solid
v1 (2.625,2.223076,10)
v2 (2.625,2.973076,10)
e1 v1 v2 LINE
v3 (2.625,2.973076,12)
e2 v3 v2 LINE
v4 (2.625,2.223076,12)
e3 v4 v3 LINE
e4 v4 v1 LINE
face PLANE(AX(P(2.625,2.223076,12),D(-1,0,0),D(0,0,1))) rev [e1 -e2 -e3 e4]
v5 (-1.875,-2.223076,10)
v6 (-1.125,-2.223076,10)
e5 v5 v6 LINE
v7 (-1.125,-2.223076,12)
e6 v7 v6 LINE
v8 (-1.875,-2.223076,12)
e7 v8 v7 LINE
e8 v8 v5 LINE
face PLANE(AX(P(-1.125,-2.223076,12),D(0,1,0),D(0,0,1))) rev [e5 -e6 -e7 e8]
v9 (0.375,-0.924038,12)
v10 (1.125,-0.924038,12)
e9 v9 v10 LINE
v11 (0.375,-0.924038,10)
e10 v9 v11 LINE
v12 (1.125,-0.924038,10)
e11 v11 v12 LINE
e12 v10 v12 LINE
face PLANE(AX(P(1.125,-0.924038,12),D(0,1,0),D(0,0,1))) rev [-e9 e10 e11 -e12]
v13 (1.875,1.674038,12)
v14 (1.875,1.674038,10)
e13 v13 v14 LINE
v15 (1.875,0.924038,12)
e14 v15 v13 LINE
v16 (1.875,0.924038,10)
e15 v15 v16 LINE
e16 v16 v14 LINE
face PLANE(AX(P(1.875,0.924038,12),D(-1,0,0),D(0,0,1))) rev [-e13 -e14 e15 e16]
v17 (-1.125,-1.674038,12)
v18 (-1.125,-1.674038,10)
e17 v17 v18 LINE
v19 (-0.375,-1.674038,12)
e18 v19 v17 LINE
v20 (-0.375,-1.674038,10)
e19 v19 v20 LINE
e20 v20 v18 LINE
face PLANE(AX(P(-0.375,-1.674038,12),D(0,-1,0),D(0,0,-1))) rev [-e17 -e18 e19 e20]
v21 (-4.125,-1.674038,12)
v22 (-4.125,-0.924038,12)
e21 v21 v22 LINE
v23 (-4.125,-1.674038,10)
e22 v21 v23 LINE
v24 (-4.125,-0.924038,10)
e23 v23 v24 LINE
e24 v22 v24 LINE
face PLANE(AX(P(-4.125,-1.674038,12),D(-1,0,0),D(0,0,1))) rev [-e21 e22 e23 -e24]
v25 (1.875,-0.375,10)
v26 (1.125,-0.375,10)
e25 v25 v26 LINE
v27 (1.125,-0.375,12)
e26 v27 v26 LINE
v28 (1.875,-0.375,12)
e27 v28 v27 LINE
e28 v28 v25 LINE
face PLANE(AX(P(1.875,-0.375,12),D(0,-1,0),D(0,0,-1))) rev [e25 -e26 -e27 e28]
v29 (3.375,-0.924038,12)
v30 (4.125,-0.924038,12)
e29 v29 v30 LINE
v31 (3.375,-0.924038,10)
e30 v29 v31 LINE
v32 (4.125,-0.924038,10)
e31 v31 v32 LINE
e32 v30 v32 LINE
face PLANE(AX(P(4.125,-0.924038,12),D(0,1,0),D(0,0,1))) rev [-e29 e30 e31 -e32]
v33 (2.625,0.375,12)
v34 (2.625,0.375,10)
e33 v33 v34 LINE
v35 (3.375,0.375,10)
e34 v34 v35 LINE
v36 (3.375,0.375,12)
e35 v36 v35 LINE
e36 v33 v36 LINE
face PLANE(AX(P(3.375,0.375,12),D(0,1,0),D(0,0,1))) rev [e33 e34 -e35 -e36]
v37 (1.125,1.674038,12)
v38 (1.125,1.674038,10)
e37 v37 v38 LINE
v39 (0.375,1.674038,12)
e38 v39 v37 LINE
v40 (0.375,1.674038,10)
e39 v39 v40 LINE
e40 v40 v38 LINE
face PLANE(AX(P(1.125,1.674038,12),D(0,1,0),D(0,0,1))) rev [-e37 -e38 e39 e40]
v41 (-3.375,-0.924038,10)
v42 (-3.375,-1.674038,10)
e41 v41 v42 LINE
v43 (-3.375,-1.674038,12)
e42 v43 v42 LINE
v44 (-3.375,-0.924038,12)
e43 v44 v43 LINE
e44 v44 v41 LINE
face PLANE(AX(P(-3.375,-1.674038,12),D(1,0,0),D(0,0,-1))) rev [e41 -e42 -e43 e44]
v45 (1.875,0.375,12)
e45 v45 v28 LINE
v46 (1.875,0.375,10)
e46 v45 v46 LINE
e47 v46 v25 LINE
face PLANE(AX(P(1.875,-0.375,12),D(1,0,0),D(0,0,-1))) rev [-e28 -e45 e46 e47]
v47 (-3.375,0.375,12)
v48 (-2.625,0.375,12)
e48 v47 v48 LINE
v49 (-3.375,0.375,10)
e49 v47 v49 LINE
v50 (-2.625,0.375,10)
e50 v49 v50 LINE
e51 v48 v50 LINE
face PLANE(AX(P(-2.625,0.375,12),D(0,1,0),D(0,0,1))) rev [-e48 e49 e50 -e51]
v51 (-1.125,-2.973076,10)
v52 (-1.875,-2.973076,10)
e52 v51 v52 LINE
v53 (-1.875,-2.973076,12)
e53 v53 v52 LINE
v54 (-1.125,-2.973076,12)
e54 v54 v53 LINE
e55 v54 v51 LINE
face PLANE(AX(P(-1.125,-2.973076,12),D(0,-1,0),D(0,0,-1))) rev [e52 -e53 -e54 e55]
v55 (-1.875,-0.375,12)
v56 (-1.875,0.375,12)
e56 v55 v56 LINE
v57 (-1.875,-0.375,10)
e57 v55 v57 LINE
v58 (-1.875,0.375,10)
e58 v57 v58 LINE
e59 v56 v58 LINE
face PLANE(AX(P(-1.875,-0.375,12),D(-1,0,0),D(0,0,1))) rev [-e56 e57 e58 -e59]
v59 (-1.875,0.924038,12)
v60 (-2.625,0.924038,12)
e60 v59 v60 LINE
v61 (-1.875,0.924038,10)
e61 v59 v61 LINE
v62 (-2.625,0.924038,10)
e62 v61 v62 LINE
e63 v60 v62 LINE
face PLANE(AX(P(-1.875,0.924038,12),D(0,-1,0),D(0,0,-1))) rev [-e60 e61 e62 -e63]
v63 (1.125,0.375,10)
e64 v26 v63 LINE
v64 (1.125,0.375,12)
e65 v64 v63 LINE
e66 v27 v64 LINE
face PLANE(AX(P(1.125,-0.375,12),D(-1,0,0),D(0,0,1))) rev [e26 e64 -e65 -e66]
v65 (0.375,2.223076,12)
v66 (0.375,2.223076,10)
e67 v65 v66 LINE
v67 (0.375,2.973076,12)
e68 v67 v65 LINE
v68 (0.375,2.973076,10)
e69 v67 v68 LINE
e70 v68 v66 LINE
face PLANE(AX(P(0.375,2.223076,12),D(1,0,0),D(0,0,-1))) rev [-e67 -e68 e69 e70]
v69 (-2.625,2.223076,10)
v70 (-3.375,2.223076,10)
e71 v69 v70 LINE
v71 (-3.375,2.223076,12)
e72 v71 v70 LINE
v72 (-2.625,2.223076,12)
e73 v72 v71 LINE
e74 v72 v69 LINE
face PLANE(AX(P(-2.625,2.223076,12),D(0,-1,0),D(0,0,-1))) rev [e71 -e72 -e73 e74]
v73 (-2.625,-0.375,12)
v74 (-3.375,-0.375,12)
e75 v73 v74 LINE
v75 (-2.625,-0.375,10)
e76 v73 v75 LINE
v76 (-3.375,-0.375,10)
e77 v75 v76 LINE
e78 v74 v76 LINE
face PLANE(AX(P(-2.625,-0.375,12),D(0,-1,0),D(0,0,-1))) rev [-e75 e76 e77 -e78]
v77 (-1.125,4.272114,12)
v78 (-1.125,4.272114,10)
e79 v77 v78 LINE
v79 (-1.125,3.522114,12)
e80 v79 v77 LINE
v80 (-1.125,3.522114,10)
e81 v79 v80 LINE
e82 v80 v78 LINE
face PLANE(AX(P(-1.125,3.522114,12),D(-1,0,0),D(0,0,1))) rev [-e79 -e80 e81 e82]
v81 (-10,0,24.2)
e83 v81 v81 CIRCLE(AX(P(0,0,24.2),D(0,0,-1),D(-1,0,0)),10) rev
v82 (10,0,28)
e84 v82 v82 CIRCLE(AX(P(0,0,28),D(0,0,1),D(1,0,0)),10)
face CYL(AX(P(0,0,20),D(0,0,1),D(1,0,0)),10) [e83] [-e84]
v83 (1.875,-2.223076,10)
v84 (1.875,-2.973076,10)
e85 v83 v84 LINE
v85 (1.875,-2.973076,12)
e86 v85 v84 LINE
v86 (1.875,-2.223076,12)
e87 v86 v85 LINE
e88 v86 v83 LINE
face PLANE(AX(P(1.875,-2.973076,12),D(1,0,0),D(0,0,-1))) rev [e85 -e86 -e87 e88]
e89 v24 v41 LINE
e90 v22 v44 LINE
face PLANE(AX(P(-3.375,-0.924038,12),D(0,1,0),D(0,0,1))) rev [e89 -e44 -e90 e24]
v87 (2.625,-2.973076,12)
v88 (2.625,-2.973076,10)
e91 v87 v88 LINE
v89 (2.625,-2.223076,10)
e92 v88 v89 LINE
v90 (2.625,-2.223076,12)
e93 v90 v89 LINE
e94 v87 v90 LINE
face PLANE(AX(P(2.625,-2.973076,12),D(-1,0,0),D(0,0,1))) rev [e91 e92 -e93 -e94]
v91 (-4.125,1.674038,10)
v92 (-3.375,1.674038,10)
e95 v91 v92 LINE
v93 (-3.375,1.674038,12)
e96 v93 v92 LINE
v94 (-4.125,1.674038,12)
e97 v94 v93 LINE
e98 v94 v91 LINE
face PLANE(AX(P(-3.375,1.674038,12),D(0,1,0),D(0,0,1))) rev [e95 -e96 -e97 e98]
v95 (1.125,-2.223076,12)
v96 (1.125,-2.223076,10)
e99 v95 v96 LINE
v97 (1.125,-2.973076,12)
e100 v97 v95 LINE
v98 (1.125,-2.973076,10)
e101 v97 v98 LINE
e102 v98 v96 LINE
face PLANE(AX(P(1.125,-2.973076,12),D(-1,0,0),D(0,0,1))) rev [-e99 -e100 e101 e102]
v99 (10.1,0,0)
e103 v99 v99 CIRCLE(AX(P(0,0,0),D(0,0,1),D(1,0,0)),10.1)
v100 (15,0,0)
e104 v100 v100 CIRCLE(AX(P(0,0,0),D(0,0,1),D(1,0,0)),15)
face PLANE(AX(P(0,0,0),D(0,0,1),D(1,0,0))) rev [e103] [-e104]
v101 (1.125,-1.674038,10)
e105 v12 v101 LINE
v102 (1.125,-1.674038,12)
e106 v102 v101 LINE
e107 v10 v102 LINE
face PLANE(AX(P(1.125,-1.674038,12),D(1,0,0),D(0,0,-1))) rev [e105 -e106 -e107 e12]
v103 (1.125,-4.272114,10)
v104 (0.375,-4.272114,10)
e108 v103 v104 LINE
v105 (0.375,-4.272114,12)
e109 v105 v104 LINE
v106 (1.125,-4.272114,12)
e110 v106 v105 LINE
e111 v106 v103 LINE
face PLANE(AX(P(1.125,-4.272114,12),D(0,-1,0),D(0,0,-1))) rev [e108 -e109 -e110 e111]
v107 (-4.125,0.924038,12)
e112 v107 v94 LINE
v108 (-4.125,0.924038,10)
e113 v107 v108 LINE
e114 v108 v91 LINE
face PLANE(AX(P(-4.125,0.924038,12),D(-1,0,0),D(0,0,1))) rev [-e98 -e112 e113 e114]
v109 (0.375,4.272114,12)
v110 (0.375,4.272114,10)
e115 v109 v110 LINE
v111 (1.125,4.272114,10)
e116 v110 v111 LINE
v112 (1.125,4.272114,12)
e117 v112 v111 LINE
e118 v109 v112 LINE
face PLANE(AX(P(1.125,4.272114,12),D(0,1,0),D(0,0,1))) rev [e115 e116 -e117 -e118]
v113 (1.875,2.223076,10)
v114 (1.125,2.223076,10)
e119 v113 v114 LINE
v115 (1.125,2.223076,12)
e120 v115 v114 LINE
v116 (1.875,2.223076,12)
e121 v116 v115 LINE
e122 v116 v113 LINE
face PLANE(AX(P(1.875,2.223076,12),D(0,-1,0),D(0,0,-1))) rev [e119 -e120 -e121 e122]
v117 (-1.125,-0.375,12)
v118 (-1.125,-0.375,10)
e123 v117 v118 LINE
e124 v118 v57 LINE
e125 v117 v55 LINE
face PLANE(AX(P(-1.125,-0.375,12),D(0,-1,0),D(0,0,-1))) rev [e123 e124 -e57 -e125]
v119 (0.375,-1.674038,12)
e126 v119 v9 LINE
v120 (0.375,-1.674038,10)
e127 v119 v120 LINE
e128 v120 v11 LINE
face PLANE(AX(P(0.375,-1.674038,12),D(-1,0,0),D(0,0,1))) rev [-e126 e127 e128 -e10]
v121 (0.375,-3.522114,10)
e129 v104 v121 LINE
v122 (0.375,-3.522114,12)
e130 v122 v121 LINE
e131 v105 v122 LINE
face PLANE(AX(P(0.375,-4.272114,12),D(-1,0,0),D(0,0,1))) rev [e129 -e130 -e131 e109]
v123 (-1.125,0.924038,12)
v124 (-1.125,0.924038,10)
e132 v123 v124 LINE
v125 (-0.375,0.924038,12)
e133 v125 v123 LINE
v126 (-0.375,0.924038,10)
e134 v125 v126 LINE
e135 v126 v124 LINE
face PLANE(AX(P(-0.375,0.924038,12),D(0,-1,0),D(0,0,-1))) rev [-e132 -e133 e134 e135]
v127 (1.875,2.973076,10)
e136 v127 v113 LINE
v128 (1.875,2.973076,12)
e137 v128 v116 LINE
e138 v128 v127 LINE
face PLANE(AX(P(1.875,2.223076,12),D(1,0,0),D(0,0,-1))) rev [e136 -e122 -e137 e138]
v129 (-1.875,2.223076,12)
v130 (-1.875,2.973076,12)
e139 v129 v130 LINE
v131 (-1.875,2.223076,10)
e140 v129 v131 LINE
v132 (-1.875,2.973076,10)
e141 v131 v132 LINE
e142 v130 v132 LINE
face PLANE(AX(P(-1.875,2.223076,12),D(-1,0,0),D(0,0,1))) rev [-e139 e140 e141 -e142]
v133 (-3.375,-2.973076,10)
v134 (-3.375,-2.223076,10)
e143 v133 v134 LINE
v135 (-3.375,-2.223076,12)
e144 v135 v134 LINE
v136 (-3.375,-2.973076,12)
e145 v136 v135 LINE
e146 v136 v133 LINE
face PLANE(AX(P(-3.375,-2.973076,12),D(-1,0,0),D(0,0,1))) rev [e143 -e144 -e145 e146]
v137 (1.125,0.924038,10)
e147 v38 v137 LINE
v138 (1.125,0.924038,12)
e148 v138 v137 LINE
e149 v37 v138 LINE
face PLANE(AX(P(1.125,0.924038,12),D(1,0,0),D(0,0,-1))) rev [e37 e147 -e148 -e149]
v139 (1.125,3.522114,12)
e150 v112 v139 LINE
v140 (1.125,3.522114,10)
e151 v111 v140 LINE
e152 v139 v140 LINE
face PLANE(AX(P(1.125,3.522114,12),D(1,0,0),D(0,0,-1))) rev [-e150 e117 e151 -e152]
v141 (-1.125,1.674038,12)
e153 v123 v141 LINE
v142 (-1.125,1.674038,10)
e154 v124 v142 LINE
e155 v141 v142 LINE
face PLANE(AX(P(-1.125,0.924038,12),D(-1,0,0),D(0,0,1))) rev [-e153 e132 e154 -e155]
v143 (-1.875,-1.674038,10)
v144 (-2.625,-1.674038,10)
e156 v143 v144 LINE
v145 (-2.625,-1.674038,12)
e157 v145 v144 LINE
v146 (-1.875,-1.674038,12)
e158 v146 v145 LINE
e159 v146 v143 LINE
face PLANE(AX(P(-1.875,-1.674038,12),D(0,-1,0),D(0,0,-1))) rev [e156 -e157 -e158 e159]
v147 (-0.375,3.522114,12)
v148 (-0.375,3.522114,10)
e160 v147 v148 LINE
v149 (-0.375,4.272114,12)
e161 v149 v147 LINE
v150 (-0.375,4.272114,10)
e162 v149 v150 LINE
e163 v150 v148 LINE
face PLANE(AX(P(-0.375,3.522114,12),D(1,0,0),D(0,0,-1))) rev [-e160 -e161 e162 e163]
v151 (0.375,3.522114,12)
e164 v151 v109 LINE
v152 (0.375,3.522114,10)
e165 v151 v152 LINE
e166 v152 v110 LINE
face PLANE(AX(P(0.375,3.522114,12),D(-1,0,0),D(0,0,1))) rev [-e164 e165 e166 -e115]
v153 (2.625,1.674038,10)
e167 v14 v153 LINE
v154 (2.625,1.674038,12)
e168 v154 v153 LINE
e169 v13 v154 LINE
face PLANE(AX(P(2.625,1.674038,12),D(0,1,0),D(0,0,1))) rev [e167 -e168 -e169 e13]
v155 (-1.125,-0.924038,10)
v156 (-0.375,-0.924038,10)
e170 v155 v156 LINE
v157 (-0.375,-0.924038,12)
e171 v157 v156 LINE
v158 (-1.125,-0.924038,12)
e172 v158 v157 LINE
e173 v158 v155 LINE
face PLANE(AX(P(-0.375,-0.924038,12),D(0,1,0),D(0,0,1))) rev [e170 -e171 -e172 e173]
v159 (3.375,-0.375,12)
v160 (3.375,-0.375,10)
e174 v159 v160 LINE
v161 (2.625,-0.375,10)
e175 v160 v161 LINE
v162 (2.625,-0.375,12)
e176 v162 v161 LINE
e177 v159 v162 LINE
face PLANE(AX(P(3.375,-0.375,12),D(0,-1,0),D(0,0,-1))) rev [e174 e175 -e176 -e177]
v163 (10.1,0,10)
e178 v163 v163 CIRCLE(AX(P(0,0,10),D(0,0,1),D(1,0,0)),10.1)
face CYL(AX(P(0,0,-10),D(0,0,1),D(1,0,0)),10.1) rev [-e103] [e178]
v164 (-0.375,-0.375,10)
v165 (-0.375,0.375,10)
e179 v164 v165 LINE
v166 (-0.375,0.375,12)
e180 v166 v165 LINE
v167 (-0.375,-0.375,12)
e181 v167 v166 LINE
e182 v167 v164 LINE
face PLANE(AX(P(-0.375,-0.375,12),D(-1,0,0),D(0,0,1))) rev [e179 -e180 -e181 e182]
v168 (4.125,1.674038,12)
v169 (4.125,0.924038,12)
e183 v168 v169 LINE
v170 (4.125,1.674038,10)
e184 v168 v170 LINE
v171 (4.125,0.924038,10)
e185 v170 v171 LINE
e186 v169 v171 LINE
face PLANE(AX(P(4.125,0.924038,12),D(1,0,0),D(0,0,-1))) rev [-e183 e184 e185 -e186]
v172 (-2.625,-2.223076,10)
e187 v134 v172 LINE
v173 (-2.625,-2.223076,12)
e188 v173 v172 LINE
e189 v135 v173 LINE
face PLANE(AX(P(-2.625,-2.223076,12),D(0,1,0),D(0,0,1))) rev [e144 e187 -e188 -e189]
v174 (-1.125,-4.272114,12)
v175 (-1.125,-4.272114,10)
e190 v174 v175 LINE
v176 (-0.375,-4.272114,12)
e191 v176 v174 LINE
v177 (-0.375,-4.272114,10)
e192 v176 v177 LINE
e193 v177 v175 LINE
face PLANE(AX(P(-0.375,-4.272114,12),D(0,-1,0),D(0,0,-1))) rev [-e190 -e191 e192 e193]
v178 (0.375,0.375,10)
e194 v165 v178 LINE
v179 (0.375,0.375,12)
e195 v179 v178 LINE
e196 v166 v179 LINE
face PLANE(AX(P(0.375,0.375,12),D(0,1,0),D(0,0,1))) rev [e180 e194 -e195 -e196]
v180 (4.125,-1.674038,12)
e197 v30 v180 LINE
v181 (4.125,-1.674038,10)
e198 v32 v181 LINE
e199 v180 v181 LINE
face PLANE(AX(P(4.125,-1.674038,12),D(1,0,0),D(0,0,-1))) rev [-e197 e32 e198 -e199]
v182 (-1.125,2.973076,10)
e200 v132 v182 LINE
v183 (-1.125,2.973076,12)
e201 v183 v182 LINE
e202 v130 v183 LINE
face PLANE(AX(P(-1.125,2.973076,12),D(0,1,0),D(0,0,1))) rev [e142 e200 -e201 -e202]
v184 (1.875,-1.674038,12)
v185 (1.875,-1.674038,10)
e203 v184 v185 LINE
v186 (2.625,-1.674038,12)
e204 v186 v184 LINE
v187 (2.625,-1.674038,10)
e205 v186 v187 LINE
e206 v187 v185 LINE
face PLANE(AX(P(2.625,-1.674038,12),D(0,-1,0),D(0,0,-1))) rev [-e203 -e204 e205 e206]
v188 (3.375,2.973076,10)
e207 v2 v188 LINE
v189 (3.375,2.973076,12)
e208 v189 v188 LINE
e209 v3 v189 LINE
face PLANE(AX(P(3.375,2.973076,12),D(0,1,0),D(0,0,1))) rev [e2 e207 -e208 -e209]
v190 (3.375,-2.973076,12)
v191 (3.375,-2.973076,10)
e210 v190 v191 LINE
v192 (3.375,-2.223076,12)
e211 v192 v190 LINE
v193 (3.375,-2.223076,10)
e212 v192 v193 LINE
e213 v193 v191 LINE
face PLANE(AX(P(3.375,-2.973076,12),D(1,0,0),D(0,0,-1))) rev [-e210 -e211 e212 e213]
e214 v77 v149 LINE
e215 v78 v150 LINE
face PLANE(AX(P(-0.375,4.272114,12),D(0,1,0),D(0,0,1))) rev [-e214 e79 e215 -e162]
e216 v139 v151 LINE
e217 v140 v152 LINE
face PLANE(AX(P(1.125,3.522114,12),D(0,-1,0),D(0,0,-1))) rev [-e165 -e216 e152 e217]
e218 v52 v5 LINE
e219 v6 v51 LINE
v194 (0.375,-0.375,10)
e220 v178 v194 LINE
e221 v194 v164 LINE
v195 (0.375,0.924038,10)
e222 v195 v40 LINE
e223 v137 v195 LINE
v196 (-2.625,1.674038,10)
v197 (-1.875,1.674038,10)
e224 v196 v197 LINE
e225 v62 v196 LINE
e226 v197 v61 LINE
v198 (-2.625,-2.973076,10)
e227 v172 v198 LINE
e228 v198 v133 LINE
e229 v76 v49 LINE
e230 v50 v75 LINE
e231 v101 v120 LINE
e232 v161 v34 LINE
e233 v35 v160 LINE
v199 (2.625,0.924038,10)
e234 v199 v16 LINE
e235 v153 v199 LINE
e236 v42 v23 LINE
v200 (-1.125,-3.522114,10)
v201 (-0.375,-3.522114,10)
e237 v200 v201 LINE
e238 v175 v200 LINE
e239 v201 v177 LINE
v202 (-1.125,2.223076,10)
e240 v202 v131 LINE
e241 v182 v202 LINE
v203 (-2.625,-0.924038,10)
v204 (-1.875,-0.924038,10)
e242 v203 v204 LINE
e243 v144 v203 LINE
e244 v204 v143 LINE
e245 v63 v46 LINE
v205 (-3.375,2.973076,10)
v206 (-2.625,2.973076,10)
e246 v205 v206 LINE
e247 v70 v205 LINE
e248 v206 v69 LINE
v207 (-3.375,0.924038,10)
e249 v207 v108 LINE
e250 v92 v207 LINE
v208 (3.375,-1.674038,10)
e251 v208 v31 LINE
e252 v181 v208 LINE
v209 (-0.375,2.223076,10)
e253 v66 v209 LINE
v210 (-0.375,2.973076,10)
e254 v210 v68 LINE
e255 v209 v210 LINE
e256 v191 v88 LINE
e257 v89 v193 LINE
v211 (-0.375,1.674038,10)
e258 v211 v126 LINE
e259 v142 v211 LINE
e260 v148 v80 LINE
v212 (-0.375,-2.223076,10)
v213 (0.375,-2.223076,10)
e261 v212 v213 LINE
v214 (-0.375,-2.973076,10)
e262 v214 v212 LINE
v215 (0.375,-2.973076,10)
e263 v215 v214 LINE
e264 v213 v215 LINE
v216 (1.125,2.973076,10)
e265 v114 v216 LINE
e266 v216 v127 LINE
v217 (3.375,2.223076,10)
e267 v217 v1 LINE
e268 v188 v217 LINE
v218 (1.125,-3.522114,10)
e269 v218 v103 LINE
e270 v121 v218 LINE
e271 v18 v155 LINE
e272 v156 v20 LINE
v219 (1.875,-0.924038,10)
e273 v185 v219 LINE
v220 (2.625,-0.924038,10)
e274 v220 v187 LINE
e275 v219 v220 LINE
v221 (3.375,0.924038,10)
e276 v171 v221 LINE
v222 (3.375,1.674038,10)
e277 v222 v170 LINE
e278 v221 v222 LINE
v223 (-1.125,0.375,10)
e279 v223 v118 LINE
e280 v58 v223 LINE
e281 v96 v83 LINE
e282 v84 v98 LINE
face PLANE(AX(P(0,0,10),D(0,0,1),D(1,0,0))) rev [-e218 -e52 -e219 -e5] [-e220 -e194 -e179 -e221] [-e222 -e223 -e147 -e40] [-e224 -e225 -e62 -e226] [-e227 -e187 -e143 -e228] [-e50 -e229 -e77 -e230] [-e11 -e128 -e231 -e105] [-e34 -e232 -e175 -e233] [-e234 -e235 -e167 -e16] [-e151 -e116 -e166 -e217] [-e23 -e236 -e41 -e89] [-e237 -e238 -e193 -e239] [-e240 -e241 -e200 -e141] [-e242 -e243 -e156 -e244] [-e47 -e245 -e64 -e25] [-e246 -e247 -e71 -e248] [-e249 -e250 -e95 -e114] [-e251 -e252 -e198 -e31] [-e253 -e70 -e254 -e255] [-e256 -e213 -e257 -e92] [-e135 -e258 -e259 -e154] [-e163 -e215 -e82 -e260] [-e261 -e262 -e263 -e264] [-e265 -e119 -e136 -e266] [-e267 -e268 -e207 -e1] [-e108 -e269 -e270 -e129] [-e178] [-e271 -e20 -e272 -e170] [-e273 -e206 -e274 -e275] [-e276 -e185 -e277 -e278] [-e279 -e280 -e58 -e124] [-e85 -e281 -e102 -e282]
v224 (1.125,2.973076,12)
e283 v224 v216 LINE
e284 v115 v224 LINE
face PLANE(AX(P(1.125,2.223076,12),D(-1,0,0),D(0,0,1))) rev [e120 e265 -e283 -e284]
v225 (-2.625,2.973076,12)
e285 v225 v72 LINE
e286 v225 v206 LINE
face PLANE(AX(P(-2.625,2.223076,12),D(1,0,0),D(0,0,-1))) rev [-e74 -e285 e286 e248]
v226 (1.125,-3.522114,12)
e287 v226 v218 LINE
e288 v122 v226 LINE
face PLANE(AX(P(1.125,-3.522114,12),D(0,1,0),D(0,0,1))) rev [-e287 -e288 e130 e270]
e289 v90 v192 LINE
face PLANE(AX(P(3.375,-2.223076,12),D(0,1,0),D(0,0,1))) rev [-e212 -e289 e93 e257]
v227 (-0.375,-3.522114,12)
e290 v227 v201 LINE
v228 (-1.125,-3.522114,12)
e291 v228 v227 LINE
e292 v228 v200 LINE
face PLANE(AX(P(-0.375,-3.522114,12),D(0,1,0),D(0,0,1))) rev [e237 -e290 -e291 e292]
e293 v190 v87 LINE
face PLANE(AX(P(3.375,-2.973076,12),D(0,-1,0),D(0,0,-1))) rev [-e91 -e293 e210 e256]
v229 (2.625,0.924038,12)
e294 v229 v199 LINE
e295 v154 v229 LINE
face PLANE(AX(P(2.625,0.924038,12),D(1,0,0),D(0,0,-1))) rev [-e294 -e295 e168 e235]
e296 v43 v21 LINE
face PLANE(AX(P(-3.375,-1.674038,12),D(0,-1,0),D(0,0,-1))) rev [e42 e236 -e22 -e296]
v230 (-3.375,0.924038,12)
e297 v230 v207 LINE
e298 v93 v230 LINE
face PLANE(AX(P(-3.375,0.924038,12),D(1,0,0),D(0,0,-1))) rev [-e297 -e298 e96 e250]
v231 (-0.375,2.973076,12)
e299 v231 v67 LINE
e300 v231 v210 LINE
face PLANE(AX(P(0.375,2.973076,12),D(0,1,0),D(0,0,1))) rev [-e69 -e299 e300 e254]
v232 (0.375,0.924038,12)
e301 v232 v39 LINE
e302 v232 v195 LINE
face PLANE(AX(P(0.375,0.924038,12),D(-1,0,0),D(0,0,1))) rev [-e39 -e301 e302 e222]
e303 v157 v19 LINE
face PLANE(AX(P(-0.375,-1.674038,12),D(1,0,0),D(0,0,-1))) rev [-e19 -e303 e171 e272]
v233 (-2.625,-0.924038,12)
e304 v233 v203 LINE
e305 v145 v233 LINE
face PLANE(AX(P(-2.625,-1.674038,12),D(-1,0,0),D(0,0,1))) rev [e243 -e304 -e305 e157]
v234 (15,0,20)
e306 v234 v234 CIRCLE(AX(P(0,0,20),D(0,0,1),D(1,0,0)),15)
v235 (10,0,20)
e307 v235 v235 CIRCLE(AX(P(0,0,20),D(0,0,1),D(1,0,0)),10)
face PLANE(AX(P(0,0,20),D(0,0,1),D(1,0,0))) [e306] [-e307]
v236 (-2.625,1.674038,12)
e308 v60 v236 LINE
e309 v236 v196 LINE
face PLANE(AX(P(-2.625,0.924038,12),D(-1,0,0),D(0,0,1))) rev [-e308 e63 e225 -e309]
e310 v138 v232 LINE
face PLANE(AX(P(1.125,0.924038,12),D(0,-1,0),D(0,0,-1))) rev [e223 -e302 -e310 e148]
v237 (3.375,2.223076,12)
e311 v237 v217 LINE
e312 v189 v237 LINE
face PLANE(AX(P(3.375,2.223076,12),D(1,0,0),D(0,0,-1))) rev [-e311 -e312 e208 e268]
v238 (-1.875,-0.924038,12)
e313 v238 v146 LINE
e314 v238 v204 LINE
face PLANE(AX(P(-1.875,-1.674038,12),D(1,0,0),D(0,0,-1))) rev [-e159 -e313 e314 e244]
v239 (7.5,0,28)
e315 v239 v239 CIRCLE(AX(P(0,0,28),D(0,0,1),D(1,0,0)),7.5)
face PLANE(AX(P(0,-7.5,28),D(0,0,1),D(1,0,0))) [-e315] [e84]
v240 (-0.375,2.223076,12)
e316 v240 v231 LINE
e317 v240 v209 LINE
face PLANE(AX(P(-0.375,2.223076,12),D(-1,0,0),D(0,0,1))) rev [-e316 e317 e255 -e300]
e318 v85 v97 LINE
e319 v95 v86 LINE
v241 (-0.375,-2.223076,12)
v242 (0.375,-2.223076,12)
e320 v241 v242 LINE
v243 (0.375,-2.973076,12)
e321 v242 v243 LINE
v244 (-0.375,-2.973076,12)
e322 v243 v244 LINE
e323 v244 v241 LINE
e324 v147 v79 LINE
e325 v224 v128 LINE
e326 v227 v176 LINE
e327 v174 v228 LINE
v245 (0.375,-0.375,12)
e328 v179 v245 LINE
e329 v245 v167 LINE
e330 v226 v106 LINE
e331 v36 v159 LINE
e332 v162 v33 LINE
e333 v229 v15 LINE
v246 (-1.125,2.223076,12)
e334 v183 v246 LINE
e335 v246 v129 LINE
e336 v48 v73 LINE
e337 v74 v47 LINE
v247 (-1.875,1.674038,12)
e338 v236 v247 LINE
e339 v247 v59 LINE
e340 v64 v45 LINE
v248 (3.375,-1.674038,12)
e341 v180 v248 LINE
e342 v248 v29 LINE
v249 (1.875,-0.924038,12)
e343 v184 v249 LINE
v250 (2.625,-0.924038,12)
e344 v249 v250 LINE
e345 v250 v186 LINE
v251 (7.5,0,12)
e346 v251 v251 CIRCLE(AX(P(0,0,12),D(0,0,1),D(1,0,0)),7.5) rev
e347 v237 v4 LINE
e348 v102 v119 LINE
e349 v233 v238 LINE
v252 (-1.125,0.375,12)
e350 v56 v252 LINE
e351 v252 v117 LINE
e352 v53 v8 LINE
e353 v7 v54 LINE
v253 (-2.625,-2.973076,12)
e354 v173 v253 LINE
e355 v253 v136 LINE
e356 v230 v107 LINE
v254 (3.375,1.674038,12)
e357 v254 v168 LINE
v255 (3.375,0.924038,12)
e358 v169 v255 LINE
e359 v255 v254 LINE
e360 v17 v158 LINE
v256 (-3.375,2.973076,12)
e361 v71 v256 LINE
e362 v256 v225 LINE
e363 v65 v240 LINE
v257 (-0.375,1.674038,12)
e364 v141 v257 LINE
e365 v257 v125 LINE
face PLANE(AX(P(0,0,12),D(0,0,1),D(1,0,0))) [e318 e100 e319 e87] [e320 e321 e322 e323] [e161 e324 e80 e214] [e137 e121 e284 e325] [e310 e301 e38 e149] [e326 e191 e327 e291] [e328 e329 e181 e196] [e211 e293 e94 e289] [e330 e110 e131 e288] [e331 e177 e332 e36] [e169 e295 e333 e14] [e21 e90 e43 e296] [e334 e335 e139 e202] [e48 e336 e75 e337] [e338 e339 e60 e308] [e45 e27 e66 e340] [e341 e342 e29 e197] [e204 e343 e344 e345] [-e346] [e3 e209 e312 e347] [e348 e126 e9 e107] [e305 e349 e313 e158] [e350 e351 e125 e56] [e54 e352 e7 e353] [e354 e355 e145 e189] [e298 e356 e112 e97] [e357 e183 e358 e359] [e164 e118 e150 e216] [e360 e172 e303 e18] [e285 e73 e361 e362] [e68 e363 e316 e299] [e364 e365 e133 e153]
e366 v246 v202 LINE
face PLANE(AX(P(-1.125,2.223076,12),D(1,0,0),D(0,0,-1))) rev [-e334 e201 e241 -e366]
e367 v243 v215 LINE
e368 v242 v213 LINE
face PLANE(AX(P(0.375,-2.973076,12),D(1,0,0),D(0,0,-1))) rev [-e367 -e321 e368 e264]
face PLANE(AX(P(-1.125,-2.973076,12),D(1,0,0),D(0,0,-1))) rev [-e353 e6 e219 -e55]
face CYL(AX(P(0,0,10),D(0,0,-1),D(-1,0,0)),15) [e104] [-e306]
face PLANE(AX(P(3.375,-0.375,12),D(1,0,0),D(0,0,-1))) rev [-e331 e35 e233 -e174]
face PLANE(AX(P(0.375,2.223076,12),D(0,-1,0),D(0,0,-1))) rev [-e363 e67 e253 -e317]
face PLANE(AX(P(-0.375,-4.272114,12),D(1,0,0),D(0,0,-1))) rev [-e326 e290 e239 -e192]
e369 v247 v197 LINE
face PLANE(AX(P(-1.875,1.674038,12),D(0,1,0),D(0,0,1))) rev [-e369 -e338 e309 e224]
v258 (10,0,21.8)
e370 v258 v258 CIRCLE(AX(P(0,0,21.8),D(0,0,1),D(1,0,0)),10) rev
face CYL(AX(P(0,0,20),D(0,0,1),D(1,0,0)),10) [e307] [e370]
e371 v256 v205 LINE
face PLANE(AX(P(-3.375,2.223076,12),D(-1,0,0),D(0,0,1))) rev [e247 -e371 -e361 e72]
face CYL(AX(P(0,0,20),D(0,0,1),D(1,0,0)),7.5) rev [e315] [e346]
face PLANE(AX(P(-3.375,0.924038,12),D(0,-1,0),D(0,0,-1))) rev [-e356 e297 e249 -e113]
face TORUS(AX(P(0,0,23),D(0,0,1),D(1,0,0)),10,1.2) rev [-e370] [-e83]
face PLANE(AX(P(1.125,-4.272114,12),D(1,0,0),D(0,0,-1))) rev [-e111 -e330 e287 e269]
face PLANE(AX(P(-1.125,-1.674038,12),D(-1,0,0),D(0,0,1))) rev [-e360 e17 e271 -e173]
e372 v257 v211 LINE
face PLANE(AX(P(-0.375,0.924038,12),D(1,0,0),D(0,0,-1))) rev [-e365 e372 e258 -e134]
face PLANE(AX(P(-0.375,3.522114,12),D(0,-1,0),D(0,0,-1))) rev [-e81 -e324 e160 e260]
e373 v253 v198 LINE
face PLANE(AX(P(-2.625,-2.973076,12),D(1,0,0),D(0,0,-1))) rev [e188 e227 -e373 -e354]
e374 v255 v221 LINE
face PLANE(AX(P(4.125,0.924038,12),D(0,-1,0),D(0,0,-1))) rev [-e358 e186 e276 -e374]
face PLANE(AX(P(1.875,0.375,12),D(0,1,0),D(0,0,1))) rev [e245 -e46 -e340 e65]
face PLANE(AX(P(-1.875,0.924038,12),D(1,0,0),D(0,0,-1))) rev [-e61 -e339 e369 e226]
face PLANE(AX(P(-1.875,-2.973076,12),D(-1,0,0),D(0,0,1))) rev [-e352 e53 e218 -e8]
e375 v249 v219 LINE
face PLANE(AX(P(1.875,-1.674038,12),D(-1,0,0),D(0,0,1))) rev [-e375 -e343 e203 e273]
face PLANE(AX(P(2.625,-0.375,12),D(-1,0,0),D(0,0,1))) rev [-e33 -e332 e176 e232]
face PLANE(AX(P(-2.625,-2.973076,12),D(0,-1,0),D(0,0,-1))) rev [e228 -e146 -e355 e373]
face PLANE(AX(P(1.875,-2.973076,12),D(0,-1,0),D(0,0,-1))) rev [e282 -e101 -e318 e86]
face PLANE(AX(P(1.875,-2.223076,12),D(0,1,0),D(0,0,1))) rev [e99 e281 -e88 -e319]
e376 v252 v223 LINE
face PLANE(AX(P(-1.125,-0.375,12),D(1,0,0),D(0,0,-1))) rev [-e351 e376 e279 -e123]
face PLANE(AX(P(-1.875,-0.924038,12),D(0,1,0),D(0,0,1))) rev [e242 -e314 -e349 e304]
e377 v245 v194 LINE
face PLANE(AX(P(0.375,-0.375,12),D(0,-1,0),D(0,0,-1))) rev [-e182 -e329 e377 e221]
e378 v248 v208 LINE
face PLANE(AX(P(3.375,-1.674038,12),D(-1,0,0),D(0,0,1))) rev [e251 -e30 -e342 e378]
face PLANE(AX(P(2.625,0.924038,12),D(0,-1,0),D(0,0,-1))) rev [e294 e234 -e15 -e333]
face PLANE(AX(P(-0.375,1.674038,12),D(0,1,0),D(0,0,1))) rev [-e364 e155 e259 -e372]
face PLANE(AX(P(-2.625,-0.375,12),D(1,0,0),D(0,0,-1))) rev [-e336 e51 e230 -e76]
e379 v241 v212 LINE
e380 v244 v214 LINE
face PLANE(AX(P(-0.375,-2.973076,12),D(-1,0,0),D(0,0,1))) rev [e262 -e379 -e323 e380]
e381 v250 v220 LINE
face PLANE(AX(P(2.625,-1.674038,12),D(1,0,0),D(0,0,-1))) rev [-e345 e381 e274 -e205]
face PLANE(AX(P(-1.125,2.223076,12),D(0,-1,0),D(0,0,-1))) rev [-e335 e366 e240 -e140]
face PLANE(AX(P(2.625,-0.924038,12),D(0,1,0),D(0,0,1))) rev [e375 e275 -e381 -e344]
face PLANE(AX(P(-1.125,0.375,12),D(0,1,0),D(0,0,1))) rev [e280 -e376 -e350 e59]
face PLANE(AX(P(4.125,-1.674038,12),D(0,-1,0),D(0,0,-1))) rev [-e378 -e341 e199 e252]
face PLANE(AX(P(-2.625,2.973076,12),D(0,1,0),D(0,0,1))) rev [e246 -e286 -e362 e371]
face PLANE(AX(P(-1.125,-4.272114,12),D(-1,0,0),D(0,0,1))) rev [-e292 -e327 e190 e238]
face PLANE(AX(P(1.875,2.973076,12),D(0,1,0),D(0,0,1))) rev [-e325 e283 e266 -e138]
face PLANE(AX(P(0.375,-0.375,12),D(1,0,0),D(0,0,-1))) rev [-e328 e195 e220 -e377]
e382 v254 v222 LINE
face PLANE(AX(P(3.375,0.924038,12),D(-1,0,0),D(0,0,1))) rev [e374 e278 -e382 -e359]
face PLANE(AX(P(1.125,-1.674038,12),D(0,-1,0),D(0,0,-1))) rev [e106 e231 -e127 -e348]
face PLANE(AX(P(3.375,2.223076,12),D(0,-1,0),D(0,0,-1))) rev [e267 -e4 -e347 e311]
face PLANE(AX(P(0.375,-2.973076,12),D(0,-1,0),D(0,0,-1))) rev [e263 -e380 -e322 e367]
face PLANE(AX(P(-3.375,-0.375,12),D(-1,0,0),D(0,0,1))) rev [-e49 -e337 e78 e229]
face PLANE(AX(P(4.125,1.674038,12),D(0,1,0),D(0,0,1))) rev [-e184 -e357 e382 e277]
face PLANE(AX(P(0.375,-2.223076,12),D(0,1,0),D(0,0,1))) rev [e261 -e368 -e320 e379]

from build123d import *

# Parameters (mm, degrees)
SKETCH1_R                  = 15
BOSS_EXTRUDE1_DEPTH        = 10
SKETCH2_R                  = 10.1
CUT_EXTRUDE1_DEPTH         = 20
SKETCH3_R                  = 15
BOSS_EXTRUDE2_DEPTH        = 10
SKETCH5_R                  = 10
CUT_EXTRUDE3_DEPTH         = 8
SKETCH8_W                  = 0.75
SKETCH8_H                  = 0.75
CUT_EXTRUDE5_DEPTH         = 2
FILL_START                 = -1.125
FILL_PATTERN2_OUTLINE_W    = 0.75
FILL_PATTERN2_OUTLINE_H    = 2
FILL_PATTERN2_DEPTH        = 0.75
FILL_START_2               = 0.375
FILL_PATTERN2_2_OUTLINE_W  = 0.75
FILL_PATTERN2_2_OUTLINE_H  = 2
FILL_PATTERN2_2_DEPTH      = 0.75
FILL_START_3               = -3.375
FILL_PATTERN2_3_OUTLINE_W  = 0.75
FILL_PATTERN2_3_OUTLINE_H  = 2
FILL_PATTERN2_3_DEPTH      = 0.75
FILL_START_4               = -1.875
FILL_PATTERN2_4_OUTLINE_W  = 0.75
FILL_PATTERN2_4_OUTLINE_H  = 2
FILL_PATTERN2_4_DEPTH      = 0.75
FILL_START_5               = 1.125
FILL_PATTERN2_5_OUTLINE_W  = 0.75
FILL_PATTERN2_5_OUTLINE_H  = 2
FILL_PATTERN2_5_DEPTH      = 0.75
FILL_START_6               = 2.625
FILL_PATTERN2_6_OUTLINE_W  = 0.75
FILL_PATTERN2_6_OUTLINE_H  = 2
FILL_PATTERN2_6_DEPTH      = 0.75
FILL_START_7               = -4.125
FILL_PATTERN2_7_OUTLINE_W  = 0.75
FILL_PATTERN2_7_OUTLINE_H  = 2
FILL_PATTERN2_7_DEPTH      = 0.75
FILL_START_8               = -2.625
FILL_PATTERN2_8_OUTLINE_W  = 0.75
FILL_PATTERN2_8_OUTLINE_H  = 2
FILL_PATTERN2_8_DEPTH      = 0.75
FILL_START_9               = -0.375
FILL_PATTERN2_9_OUTLINE_W  = 0.75
FILL_PATTERN2_9_OUTLINE_H  = 2
FILL_PATTERN2_9_DEPTH      = 0.75
FILL_START_10              = 1.875
FILL_PATTERN2_10_OUTLINE_W = 0.75
FILL_PATTERN2_10_OUTLINE_H = 2
FILL_PATTERN2_10_DEPTH     = 0.75
FILL_START_11              = 3.375
FILL_PATTERN2_11_OUTLINE_W = 0.75
FILL_PATTERN2_11_OUTLINE_H = 2
FILL_PATTERN2_11_DEPTH     = 0.75
SKETCH15_W                 = 16
SKETCH15_H                 = 2.5
SKETCH16_R                 = 1.2


# Read off the part's stored shape, not the designer's step: Fill Pattern2
with BuildPart() as part:
    # Sketch1 → Boss-Extrude1 (new body)
    with BuildSketch(Plane.XY):
        Circle(SKETCH1_R)
    extrude(amount=BOSS_EXTRUDE1_DEPTH)

    # Sketch2 → Cut-Extrude1 (cut)
    with BuildSketch(Plane.XY.offset(10)):
        Circle(SKETCH2_R)
    extrude(amount=-CUT_EXTRUDE1_DEPTH, mode=Mode.SUBTRACT)

    # Sketch3 → Boss-Extrude2 (add)
    with BuildSketch(Plane.XY.offset(10)):
        Circle(SKETCH3_R)
    extrude(amount=BOSS_EXTRUDE2_DEPTH)

    # Sketch5 → Cut-Extrude3 (cut)
    with BuildSketch(Plane.XY.offset(20)):
        Circle(SKETCH5_R)
    extrude(amount=-CUT_EXTRUDE3_DEPTH, mode=Mode.SUBTRACT)

    # Sketch8 → Cut-Extrude5 (cut)
    with BuildSketch(Plane(origin=(0, 0, 10), x_dir=(-1, 0, 0), z_dir=(0, 0, -1))):
        Rectangle(SKETCH8_W, SKETCH8_H)
    extrude(amount=-CUT_EXTRUDE5_DEPTH, mode=Mode.SUBTRACT)

    # Fill Pattern2 outline → Fill Pattern2 (cut)
    with BuildSketch(Plane.YZ.offset(FILL_START)):
        with Locations((-1.299038106, 11)):
            Rectangle(FILL_PATTERN2_OUTLINE_W, FILL_PATTERN2_OUTLINE_H)
        with Locations((1.299038106, 11)):
            Rectangle(FILL_PATTERN2_OUTLINE_W, FILL_PATTERN2_OUTLINE_H)
        with Locations((-3.897114317, 11)):
            Rectangle(FILL_PATTERN2_OUTLINE_W, FILL_PATTERN2_OUTLINE_H)
        with Locations((3.897114317, 11)):
            Rectangle(FILL_PATTERN2_OUTLINE_W, FILL_PATTERN2_OUTLINE_H)
    extrude(amount=FILL_PATTERN2_DEPTH, mode=Mode.SUBTRACT)

    # Fill Pattern2 2 outline → Fill Pattern2 2 (cut)
    with BuildSketch(Plane.YZ.offset(FILL_START_2)):
        with Locations((-1.299038106, 11)):
            Rectangle(FILL_PATTERN2_2_OUTLINE_W, FILL_PATTERN2_2_OUTLINE_H)
        with Locations((1.299038106, 11)):
            Rectangle(FILL_PATTERN2_2_OUTLINE_W, FILL_PATTERN2_2_OUTLINE_H)
        with Locations((-3.897114317, 11)):
            Rectangle(FILL_PATTERN2_2_OUTLINE_W, FILL_PATTERN2_2_OUTLINE_H)
        with Locations((3.897114317, 11)):
            Rectangle(FILL_PATTERN2_2_OUTLINE_W, FILL_PATTERN2_2_OUTLINE_H)
    extrude(amount=FILL_PATTERN2_2_DEPTH, mode=Mode.SUBTRACT)

    # Fill Pattern2 3 outline → Fill Pattern2 3 (cut)
    with BuildSketch(Plane.YZ.offset(FILL_START_3)):
        with Locations((0, 11)):
            Rectangle(FILL_PATTERN2_3_OUTLINE_W, FILL_PATTERN2_3_OUTLINE_H)
        with Locations((-2.598076211, 11)):
            Rectangle(FILL_PATTERN2_3_OUTLINE_W, FILL_PATTERN2_3_OUTLINE_H)
        with Locations((2.598076211, 11)):
            Rectangle(FILL_PATTERN2_3_OUTLINE_W, FILL_PATTERN2_3_OUTLINE_H)
    extrude(amount=FILL_PATTERN2_3_DEPTH, mode=Mode.SUBTRACT)

    # Fill Pattern2 4 outline → Fill Pattern2 4 (cut)
    with BuildSketch(Plane.YZ.offset(FILL_START_4)):
        with Locations((0, 11)):
            Rectangle(FILL_PATTERN2_4_OUTLINE_W, FILL_PATTERN2_4_OUTLINE_H)
        with Locations((-2.598076211, 11)):
            Rectangle(FILL_PATTERN2_4_OUTLINE_W, FILL_PATTERN2_4_OUTLINE_H)
        with Locations((2.598076211, 11)):
            Rectangle(FILL_PATTERN2_4_OUTLINE_W, FILL_PATTERN2_4_OUTLINE_H)
    extrude(amount=FILL_PATTERN2_4_DEPTH, mode=Mode.SUBTRACT)

    # Fill Pattern2 5 outline → Fill Pattern2 5 (cut)
    with BuildSketch(Plane.YZ.offset(FILL_START_5)):
        with Locations((0, 11)):
            Rectangle(FILL_PATTERN2_5_OUTLINE_W, FILL_PATTERN2_5_OUTLINE_H)
        with Locations((-2.598076211, 11)):
            Rectangle(FILL_PATTERN2_5_OUTLINE_W, FILL_PATTERN2_5_OUTLINE_H)
        with Locations((2.598076211, 11)):
            Rectangle(FILL_PATTERN2_5_OUTLINE_W, FILL_PATTERN2_5_OUTLINE_H)
    extrude(amount=FILL_PATTERN2_5_DEPTH, mode=Mode.SUBTRACT)

    # Fill Pattern2 6 outline → Fill Pattern2 6 (cut)
    with BuildSketch(Plane.YZ.offset(FILL_START_6)):
        with Locations((0, 11)):
            Rectangle(FILL_PATTERN2_6_OUTLINE_W, FILL_PATTERN2_6_OUTLINE_H)
        with Locations((-2.598076211, 11)):
            Rectangle(FILL_PATTERN2_6_OUTLINE_W, FILL_PATTERN2_6_OUTLINE_H)
        with Locations((2.598076211, 11)):
            Rectangle(FILL_PATTERN2_6_OUTLINE_W, FILL_PATTERN2_6_OUTLINE_H)
    extrude(amount=FILL_PATTERN2_6_DEPTH, mode=Mode.SUBTRACT)

    # Fill Pattern2 7 outline → Fill Pattern2 7 (cut)
    with BuildSketch(Plane.YZ.offset(FILL_START_7)):
        with Locations((-1.299038106, 11)):
            Rectangle(FILL_PATTERN2_7_OUTLINE_W, FILL_PATTERN2_7_OUTLINE_H)
        with Locations((1.299038106, 11)):
            Rectangle(FILL_PATTERN2_7_OUTLINE_W, FILL_PATTERN2_7_OUTLINE_H)
    extrude(amount=FILL_PATTERN2_7_DEPTH, mode=Mode.SUBTRACT)

    # Fill Pattern2 8 outline → Fill Pattern2 8 (cut)
    with BuildSketch(Plane.YZ.offset(FILL_START_8)):
        with Locations((-1.299038106, 11)):
            Rectangle(FILL_PATTERN2_8_OUTLINE_W, FILL_PATTERN2_8_OUTLINE_H)
        with Locations((1.299038106, 11)):
            Rectangle(FILL_PATTERN2_8_OUTLINE_W, FILL_PATTERN2_8_OUTLINE_H)
    extrude(amount=FILL_PATTERN2_8_DEPTH, mode=Mode.SUBTRACT)

    # Fill Pattern2 9 outline → Fill Pattern2 9 (cut)
    with BuildSketch(Plane.YZ.offset(FILL_START_9)):
        with Locations((-2.598076211, 11)):
            Rectangle(FILL_PATTERN2_9_OUTLINE_W, FILL_PATTERN2_9_OUTLINE_H)
        with Locations((2.598076211, 11)):
            Rectangle(FILL_PATTERN2_9_OUTLINE_W, FILL_PATTERN2_9_OUTLINE_H)
    extrude(amount=FILL_PATTERN2_9_DEPTH, mode=Mode.SUBTRACT)

    # Fill Pattern2 10 outline → Fill Pattern2 10 (cut)
    with BuildSketch(Plane.YZ.offset(FILL_START_10)):
        with Locations((-1.299038106, 11)):
            Rectangle(FILL_PATTERN2_10_OUTLINE_W, FILL_PATTERN2_10_OUTLINE_H)
        with Locations((1.299038106, 11)):
            Rectangle(FILL_PATTERN2_10_OUTLINE_W, FILL_PATTERN2_10_OUTLINE_H)
    extrude(amount=FILL_PATTERN2_10_DEPTH, mode=Mode.SUBTRACT)

    # Fill Pattern2 11 outline → Fill Pattern2 11 (cut)
    with BuildSketch(Plane.YZ.offset(FILL_START_11)):
        with Locations((-1.299038106, 11)):
            Rectangle(FILL_PATTERN2_11_OUTLINE_W, FILL_PATTERN2_11_OUTLINE_H)
        with Locations((1.299038106, 11)):
            Rectangle(FILL_PATTERN2_11_OUTLINE_W, FILL_PATTERN2_11_OUTLINE_H)
    extrude(amount=FILL_PATTERN2_11_DEPTH, mode=Mode.SUBTRACT)

    # Sketch15 → Revolve2 (revolve)
    with BuildSketch(Plane(origin=(0, 0, 0), x_dir=(0, 0, -1), z_dir=(1, 0, 0)), mode=Mode.PRIVATE) as revolve2_sk:
        with Locations((-20, -8.75)):
            Rectangle(SKETCH15_W, SKETCH15_H)
    revolve(revolve2_sk.sketch.rotate(Axis((0, 0, 20), (0, 0, -1)), 270), axis=Axis((0, 0, 20), (0, 0, -1)))

    # Sketch16 → Cut-Revolve2 (revolve, cut)
    with BuildSketch(Plane(origin=(0, 0, 0), x_dir=(0, 0, -1), z_dir=(1, 0, 0)), mode=Mode.PRIVATE) as cut_revolve2_sk:
        with Locations((-23, 10)):
            Circle(SKETCH16_R)
    revolve(cut_revolve2_sk.sketch.rotate(Axis((0, 0, 20), (0, 0, -1)), 90), axis=Axis((0, 0, 20), (0, 0, -1)), mode=Mode.SUBTRACT)


solid = part.part
